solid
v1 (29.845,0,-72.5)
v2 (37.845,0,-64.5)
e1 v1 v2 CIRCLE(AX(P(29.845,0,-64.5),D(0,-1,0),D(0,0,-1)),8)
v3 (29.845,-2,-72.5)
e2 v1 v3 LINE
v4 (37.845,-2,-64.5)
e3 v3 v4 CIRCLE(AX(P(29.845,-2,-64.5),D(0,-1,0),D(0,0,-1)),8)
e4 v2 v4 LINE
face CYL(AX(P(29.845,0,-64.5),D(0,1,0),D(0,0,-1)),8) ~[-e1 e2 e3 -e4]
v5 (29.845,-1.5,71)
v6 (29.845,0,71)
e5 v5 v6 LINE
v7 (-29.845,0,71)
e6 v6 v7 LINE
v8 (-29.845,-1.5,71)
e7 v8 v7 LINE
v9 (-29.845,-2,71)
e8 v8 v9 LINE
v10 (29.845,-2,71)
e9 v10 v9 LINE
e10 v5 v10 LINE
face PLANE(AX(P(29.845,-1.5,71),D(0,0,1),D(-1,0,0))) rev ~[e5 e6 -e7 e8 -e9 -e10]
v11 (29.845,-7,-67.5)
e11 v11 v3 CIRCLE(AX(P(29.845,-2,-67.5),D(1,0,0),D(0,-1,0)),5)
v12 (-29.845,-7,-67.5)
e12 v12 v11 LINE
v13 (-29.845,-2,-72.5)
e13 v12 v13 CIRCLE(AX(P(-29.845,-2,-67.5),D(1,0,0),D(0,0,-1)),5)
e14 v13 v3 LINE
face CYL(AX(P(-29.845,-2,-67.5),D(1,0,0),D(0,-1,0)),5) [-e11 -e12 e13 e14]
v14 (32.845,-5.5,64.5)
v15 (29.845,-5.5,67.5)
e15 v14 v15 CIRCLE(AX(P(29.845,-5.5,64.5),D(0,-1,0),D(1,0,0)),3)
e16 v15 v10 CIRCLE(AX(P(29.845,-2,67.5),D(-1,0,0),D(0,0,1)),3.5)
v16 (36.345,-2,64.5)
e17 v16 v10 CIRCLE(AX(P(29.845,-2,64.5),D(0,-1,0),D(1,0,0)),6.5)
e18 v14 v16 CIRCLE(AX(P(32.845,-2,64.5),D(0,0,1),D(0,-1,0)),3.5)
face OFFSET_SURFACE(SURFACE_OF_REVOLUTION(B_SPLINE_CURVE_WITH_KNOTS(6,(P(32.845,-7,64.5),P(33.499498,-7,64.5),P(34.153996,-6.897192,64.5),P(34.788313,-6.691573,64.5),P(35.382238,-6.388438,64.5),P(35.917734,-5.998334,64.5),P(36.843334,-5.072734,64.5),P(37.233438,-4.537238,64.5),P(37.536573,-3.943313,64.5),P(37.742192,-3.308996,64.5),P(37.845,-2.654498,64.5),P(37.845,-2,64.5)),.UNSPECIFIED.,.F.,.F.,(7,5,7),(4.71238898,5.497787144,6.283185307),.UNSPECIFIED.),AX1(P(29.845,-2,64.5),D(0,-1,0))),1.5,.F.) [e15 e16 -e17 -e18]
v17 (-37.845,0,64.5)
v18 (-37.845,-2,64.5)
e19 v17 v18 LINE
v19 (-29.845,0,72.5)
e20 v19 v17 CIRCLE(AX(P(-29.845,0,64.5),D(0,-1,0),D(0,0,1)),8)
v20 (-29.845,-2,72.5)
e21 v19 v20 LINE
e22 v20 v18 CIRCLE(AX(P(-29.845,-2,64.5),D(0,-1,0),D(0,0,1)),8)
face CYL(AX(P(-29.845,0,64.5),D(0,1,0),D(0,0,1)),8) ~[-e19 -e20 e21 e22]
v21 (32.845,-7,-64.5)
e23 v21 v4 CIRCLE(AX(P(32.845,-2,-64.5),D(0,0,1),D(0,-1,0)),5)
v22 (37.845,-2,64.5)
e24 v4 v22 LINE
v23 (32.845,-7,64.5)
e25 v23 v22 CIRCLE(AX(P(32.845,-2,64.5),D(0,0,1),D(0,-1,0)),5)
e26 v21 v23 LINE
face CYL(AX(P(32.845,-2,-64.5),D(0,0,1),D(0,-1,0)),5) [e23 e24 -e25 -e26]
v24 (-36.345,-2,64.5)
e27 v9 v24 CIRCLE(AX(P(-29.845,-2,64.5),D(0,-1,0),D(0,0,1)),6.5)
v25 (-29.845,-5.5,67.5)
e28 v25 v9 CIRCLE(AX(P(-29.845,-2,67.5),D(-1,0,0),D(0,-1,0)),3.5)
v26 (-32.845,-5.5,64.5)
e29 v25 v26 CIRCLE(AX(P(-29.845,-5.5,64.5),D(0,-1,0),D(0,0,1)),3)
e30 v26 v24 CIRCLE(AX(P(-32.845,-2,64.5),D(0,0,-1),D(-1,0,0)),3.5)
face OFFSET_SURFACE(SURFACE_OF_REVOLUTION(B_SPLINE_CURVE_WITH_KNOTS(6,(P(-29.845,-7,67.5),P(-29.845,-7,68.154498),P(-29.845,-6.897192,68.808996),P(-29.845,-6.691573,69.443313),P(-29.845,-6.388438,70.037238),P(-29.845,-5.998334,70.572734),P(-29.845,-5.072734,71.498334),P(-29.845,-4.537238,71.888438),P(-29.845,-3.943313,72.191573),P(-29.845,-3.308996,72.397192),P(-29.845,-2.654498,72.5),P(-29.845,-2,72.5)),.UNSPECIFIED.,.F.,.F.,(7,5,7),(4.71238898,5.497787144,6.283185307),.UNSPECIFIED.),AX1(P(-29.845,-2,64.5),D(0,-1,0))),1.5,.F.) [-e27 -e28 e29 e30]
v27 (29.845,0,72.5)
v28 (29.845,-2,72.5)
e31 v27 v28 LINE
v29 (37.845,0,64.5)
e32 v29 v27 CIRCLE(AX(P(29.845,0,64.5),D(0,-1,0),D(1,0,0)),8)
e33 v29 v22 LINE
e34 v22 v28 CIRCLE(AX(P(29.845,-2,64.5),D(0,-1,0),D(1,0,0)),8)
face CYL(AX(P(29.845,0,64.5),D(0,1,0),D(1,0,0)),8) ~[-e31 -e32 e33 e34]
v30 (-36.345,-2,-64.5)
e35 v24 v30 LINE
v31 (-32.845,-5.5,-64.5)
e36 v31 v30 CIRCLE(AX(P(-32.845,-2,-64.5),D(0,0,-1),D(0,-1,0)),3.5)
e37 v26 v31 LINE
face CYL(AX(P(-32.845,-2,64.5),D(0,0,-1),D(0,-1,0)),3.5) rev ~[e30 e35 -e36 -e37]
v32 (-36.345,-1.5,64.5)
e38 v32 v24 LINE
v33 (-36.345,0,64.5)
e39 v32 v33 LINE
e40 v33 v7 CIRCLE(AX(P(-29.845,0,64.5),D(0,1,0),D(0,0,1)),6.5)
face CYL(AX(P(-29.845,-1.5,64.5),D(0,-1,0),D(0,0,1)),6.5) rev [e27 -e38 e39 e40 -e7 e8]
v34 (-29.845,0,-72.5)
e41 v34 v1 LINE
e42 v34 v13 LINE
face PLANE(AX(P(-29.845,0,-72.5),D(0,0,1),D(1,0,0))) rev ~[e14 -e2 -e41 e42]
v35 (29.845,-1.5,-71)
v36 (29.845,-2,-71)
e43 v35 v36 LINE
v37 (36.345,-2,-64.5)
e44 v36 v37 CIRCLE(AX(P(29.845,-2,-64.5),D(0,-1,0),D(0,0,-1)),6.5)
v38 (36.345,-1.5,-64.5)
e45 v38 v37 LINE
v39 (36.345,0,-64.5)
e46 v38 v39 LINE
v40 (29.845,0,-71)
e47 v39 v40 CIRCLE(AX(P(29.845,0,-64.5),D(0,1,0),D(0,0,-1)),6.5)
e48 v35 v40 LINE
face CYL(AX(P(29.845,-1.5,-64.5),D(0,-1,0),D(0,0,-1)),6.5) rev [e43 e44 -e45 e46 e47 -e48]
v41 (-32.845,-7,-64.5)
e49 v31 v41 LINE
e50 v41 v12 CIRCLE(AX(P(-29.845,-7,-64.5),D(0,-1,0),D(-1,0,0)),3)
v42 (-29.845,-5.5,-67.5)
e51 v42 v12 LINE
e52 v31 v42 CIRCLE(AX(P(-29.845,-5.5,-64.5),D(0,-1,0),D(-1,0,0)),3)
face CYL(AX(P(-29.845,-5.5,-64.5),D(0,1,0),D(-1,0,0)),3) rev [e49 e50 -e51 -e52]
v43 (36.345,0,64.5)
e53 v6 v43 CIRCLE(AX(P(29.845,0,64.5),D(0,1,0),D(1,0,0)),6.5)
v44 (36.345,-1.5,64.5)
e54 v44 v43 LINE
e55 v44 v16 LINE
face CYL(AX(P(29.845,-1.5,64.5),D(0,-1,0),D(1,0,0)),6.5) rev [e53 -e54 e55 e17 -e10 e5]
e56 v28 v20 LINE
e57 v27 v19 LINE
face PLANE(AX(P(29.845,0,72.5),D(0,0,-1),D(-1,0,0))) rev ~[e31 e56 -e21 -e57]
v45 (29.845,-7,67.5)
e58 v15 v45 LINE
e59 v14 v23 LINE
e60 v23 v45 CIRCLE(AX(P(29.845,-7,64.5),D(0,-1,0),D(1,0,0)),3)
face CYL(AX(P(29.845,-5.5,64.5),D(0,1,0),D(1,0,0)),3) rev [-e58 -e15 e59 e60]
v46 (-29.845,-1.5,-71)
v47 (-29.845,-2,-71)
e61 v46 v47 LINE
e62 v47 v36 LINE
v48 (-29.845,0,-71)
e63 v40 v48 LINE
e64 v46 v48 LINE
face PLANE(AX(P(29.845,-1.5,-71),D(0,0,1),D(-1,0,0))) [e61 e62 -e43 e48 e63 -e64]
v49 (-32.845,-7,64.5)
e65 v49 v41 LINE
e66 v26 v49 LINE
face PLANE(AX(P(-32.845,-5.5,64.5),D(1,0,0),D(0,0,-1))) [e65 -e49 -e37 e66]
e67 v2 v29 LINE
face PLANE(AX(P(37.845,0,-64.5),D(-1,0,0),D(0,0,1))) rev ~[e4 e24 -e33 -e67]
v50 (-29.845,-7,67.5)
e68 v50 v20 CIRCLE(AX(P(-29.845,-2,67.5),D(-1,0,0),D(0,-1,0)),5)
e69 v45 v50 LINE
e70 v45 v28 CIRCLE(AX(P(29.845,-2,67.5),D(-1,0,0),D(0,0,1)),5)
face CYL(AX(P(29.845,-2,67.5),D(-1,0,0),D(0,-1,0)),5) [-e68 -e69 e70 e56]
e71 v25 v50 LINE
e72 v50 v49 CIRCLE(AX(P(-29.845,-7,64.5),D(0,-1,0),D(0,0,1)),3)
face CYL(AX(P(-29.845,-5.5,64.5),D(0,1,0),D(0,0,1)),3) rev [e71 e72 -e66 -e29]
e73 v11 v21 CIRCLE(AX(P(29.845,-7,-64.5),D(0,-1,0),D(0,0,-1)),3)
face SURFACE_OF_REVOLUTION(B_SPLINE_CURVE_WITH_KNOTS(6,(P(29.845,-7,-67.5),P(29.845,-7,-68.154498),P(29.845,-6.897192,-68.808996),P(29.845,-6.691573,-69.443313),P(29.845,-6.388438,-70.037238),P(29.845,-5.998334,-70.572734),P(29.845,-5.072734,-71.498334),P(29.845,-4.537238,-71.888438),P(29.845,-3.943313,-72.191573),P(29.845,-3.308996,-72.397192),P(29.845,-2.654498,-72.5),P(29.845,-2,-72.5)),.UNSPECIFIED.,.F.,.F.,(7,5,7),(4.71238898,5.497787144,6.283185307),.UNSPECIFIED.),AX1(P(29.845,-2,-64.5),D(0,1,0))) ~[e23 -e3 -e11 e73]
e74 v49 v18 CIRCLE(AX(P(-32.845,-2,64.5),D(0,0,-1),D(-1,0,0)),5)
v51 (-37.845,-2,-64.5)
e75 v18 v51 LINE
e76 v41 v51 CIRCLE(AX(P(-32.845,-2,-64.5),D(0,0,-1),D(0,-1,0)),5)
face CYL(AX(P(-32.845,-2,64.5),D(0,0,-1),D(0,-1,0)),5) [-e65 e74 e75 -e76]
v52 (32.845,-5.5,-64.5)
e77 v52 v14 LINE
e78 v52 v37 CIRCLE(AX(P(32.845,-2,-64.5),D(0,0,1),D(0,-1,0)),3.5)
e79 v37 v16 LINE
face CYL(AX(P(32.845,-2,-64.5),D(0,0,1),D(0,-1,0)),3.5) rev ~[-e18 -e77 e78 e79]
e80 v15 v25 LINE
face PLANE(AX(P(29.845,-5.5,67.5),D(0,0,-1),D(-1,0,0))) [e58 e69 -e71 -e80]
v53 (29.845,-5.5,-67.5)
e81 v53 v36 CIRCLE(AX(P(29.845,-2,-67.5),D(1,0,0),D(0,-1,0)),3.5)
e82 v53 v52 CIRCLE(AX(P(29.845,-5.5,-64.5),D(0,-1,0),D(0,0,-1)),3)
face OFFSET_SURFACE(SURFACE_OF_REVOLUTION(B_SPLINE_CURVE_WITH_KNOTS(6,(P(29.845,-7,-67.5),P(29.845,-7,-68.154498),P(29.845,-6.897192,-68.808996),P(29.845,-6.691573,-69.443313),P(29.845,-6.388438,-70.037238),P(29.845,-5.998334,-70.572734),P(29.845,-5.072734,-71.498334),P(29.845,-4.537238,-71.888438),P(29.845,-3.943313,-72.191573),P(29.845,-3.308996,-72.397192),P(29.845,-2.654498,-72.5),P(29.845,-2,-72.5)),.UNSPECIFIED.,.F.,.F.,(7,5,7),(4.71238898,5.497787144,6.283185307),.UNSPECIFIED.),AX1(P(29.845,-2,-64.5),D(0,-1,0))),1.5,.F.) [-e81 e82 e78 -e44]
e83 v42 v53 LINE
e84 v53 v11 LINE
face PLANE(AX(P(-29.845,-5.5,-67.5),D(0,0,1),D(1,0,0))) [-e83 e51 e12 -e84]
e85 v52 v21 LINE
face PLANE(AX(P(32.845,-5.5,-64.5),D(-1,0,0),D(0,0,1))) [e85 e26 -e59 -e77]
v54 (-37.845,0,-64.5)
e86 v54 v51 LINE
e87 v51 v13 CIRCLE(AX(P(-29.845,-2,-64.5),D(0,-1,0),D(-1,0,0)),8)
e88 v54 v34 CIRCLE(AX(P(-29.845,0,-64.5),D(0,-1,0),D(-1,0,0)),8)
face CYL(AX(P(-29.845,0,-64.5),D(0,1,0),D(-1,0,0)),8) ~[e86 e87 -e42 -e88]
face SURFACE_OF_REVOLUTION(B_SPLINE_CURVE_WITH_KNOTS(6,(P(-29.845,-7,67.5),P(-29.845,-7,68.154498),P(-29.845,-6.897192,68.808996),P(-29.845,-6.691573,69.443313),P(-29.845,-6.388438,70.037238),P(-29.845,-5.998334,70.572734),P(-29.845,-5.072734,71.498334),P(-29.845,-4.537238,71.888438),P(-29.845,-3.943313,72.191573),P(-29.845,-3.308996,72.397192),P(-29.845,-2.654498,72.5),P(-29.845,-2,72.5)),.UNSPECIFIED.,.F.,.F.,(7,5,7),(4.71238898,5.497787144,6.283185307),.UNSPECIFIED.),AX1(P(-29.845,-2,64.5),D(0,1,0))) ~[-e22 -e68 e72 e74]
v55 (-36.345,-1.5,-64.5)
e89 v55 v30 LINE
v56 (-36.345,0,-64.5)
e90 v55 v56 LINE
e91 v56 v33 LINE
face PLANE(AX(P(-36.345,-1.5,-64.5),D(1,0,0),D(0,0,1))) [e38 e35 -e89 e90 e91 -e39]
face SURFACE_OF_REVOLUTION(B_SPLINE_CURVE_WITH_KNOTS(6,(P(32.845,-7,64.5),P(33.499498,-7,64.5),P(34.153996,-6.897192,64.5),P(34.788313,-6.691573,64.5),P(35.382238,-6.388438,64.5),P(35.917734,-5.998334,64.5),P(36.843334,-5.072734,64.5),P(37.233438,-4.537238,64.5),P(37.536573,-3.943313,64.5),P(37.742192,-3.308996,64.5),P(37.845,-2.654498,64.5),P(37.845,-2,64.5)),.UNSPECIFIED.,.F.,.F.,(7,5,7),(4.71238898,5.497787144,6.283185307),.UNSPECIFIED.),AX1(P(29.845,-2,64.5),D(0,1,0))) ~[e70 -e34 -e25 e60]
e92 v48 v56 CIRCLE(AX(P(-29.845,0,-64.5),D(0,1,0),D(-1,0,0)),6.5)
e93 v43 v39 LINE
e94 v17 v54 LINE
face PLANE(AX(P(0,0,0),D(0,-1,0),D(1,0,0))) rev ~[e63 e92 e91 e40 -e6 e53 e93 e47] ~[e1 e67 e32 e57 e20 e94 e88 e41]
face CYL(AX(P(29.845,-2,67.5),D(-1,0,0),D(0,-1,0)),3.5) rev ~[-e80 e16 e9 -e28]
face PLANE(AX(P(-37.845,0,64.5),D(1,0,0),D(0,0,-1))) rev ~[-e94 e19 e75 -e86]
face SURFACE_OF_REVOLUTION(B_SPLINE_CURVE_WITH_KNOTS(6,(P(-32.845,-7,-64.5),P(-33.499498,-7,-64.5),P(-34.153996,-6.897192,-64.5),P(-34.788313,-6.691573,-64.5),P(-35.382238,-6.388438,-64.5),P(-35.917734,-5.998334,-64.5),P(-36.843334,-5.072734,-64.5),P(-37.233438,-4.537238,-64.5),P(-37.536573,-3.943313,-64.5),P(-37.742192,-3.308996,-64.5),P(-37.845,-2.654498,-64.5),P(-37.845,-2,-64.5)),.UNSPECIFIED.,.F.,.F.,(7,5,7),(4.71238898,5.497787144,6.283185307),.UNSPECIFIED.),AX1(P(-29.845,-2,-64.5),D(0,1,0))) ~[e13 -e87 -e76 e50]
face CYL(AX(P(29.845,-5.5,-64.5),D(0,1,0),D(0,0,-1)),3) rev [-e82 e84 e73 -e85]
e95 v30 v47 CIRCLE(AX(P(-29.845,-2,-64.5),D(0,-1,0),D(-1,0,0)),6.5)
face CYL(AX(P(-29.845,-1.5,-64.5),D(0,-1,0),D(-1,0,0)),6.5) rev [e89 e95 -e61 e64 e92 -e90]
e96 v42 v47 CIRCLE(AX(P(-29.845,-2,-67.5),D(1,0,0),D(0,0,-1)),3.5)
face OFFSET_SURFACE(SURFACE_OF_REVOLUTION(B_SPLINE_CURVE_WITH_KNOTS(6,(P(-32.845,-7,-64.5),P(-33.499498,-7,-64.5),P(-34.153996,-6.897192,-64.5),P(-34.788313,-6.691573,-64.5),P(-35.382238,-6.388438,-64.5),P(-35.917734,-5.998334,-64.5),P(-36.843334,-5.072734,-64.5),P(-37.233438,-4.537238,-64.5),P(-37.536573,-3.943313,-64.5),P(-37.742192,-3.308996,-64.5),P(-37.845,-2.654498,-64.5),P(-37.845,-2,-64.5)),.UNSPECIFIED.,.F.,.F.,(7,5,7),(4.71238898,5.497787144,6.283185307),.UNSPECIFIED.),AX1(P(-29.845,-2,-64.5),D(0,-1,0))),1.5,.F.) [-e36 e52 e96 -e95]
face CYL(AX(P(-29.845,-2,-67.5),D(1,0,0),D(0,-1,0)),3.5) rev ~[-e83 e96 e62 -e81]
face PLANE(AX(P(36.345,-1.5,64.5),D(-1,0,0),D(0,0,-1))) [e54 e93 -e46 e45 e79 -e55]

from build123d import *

# Parameters (mm, degrees)
F1_DEPTH = 5.11
F2_R     = 5
F3_DEPTH = 7
F4_R     = 5
F5_T     = -1.5


# Not quite as in the source:
# - a shell that OpenCascade refuses in one call is made with other operations: the cavity is built on its own and cut out


with BuildPart() as f1:
    # F0 (on Front) → F1 (new body)
    with BuildSketch(Plane.XZ):
        with BuildLine():
            Line((28.845, 71.765), (-28.845, 71.765))
            ThreePointArc((-28.845, 71.765), (-34.5018542495, 69.4218542495), (-36.845, 63.765))
            Line((-36.845, 63.765), (-36.845, -63.765))
            ThreePointArc((-36.845, -63.765), (-34.5018542495, -69.4218542495), (-28.845, -71.765))
            Line((-28.845, -71.765), (28.845, -71.765))
            ThreePointArc((28.845, -71.765), (34.5018542495, -69.4218542495), (36.845, -63.765))
            Line((36.845, -63.765), (36.845, 63.765))
            ThreePointArc((36.845, 63.765), (34.5018542495, 69.4218542495), (28.845, 71.765))
        make_face()
    extrude(amount=F1_DEPTH)

    # F2
    f2_edges = [f1.edges().sort_by_distance(p)[0] for p in [
        (36.845, -5.11, 0),
    ]]
    fillet(f2_edges, radius=F2_R)

    # F0 (on Front) → F3 (join)
    with BuildSketch(Plane.XZ):
        with BuildLine():
            Line((29.845, 72.5), (-29.845, 72.5))
            ThreePointArc((-29.845, 72.5), (-35.5018542495, 70.1568542495), (-37.845, 64.5))
            Line((-37.845, 64.5), (-37.845, -64.5))
            ThreePointArc((-37.845, -64.5), (-35.5018542495, -70.1568542495), (-29.845, -72.5))
            Line((-29.845, -72.5), (29.845, -72.5))
            ThreePointArc((29.845, -72.5), (35.5018542495, -70.1568542495), (37.845, -64.5))
            Line((37.845, -64.5), (37.845, 64.5))
            ThreePointArc((37.845, 64.5), (35.5018542495, 70.1568542495), (29.845, 72.5))
        make_face()
        with BuildLine():
            ThreePointArc((-36.845, 63.765), (-34.5018542495, 69.4218542495), (-28.845, 71.765))
            Line((-28.845, 71.765), (28.845, 71.765))
            ThreePointArc((28.845, 71.765), (34.5018542495, 69.4218542495), (36.845, 63.765))
            Line((36.845, 63.765), (36.845, -63.765))
            ThreePointArc((36.845, -63.765), (34.5018542495, -69.4218542495), (28.845, -71.765))
            Line((28.845, -71.765), (-28.845, -71.765))
            ThreePointArc((-28.845, -71.765), (-34.5018542495, -69.4218542495), (-36.845, -63.765))
            Line((-36.845, -63.765), (-36.845, 63.765))
        make_face(mode=Mode.SUBTRACT)
        with BuildLine():
            Line((28.845, 71.765), (-28.845, 71.765))
            ThreePointArc((-28.845, 71.765), (-34.5018542495, 69.4218542495), (-36.845, 63.765))
            Line((-36.845, 63.765), (-36.845, -63.765))
            ThreePointArc((-36.845, -63.765), (-34.5018542495, -69.4218542495), (-28.845, -71.765))
            Line((-28.845, -71.765), (28.845, -71.765))
            ThreePointArc((28.845, -71.765), (34.5018542495, -69.4218542495), (36.845, -63.765))
            Line((36.845, -63.765), (36.845, 63.765))
            ThreePointArc((36.845, 63.765), (34.5018542495, 69.4218542495), (28.845, 71.765))
        make_face()
    extrude(amount=F3_DEPTH)

    # F4
    f4_edges = [f1.edges().sort_by_distance(p)[0] for p in [
        (37.845, -7, 0),
    ]]
    fillet(f4_edges, radius=F4_R)

    # F5: a shell. OpenCascade refuses it in one call, so the cavity is built on its own and cut out:
    # the body offset inwards by the wall thickness, plus a prism from it out through each open face.
    f5_core = offset(f1.part, amount=F5_T, kind=Kind.INTERSECTION, mode=Mode.PRIVATE)
    f5_exits = [f5_core.faces().sort_by_distance(p)[0] for p in [
        (0, -1.5, 0),
        (0, -5.5, 0),
    ]]
    add(f5_core, mode=Mode.SUBTRACT)
    extrude(f5_exits, amount=-F5_T, mode=Mode.SUBTRACT)


solid = f1.part
